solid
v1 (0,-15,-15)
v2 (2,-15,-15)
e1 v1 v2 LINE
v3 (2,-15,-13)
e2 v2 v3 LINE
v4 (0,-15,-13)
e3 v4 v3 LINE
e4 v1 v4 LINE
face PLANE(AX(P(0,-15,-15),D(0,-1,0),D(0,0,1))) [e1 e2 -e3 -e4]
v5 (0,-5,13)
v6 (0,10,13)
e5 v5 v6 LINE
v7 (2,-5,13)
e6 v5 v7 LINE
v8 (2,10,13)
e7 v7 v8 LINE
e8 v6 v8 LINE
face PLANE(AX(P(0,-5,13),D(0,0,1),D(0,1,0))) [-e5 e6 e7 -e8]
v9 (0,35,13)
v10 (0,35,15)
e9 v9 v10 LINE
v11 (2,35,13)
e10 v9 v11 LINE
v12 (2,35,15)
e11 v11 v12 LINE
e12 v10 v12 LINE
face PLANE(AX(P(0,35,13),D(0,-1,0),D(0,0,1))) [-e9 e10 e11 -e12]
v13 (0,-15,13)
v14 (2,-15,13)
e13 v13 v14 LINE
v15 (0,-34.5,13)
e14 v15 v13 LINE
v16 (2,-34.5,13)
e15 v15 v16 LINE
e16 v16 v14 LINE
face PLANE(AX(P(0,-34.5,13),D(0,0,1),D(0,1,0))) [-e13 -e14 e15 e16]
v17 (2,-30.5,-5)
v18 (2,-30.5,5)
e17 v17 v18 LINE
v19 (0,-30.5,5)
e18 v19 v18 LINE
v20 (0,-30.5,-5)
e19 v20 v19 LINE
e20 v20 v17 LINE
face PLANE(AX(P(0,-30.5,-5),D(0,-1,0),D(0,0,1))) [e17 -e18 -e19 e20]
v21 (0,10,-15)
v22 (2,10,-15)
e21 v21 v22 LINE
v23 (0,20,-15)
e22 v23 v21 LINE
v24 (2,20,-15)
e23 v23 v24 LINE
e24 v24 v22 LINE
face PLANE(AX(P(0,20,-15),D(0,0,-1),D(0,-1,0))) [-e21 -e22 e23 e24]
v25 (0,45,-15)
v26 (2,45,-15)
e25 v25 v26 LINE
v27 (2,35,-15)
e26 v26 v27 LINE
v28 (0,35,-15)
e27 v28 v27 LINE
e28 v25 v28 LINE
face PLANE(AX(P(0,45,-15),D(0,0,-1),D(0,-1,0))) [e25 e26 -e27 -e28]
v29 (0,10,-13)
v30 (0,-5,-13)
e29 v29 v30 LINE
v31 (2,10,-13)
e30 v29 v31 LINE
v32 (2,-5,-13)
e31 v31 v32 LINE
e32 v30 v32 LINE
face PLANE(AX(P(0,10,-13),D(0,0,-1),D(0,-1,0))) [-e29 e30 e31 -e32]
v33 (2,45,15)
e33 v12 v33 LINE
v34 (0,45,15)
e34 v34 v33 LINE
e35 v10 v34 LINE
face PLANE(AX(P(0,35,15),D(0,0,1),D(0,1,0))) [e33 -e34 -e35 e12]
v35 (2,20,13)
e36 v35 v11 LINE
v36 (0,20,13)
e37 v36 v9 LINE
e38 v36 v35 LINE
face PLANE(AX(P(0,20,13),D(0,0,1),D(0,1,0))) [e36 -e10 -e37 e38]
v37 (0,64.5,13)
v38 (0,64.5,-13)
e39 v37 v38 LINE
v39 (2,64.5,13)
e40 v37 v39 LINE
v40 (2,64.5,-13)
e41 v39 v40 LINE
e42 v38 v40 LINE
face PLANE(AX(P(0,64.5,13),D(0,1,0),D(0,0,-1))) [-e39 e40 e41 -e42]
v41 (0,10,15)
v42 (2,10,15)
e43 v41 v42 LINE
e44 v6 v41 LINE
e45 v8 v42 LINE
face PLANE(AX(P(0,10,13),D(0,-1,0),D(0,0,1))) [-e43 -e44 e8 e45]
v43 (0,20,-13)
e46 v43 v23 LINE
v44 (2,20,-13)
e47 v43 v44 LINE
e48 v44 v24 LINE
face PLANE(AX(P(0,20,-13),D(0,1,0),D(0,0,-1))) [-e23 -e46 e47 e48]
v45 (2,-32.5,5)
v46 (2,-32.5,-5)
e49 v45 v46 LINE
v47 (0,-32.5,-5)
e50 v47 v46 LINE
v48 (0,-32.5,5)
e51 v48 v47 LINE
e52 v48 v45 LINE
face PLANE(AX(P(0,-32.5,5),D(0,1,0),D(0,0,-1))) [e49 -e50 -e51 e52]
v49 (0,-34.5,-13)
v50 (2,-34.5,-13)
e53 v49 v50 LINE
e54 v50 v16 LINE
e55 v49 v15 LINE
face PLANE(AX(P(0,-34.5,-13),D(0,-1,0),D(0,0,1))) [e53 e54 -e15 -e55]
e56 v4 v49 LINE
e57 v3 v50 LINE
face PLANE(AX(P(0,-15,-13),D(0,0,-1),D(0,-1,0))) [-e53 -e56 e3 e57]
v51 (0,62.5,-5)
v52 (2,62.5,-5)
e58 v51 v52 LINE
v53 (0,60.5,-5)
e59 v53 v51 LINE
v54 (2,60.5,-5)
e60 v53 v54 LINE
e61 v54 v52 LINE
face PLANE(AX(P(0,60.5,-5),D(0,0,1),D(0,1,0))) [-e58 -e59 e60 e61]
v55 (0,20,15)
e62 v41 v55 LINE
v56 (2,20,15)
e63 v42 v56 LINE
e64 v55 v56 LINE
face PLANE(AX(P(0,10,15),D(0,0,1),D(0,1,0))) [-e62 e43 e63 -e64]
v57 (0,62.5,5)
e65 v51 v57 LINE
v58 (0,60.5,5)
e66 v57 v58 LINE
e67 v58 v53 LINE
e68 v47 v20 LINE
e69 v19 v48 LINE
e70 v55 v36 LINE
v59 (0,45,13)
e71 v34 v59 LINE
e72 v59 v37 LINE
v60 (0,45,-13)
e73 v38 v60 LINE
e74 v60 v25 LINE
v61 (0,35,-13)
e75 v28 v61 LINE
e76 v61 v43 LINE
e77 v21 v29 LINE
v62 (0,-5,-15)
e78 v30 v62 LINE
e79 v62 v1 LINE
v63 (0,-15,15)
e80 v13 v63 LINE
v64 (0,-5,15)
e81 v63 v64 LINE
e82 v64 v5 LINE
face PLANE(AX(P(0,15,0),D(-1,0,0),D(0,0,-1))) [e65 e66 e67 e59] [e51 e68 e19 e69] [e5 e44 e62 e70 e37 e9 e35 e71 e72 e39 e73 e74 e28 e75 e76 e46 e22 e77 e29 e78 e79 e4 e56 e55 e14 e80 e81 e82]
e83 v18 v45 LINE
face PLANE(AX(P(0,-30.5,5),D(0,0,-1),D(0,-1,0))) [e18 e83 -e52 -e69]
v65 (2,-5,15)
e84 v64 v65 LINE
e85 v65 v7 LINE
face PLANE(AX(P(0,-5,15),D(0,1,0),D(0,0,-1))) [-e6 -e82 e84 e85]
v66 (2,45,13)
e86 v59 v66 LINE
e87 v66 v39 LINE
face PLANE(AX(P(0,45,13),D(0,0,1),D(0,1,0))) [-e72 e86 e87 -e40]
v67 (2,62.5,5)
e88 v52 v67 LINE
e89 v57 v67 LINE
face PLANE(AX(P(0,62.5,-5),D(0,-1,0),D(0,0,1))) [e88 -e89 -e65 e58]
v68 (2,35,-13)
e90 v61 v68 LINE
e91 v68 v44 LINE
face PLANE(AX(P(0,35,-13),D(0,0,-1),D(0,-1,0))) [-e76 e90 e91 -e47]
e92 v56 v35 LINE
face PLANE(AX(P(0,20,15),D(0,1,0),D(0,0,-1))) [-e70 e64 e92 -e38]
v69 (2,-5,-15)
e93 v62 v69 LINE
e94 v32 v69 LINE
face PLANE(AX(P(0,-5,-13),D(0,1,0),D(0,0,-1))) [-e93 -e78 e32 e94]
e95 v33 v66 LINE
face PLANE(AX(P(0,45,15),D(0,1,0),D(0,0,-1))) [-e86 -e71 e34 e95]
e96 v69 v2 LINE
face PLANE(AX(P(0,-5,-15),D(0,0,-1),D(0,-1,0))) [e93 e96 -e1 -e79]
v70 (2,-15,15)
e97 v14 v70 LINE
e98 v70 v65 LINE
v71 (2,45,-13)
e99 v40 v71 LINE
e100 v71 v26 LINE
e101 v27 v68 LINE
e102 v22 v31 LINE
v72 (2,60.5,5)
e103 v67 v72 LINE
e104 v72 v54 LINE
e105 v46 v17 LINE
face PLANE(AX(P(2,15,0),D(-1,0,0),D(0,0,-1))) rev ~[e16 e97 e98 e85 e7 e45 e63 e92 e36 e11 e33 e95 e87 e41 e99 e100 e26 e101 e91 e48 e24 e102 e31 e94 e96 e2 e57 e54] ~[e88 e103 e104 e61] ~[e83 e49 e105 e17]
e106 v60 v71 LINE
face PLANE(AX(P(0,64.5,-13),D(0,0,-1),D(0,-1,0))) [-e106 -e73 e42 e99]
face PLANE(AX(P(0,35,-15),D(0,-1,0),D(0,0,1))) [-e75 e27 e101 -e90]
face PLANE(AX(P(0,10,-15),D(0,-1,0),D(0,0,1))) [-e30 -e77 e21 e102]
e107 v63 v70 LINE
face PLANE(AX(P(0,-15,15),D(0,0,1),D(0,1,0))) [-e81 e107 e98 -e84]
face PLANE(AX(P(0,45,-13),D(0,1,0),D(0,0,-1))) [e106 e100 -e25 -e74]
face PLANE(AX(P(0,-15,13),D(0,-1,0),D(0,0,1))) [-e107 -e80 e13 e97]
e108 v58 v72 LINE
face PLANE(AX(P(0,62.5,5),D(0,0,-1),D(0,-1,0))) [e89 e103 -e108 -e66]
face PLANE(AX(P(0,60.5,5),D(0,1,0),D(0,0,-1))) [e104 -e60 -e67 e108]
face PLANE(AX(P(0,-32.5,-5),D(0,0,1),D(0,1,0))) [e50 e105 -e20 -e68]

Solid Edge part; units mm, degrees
sketch "Sketch1" plane through (0, 0, 0) normal (1, 0, 0) x (0, 1, 0)
  line L0 (-5, 13) -> (10, 13)
  line L1 (10, 13) -> (10, 15)
  line L2 (10, 15) -> (20, 15)
  line L3 (20, 15) -> (20, 13)
  line L4 (20, 13) -> (35, 13)
  line L5 (35, 13) -> (35, 15)
  line L6 (35, 15) -> (45, 15)
  line L7 (45, 15) -> (45, 13)
  line L8 (45, 13) -> (64.5, 13)
  line L9 (64.5, 13) -> (64.5, -13)
  line L10 (64.5, -13) -> (45, -13)
  line L11 (45, -13) -> (45, -15)
  line L12 (45, -15) -> (35, -15)
  line L13 (35, -15) -> (35, -13)
  line L14 (35, -13) -> (20, -13)
  line L15 (20, -13) -> (20, -15)
  line L16 (20, -15) -> (10, -15)
  line L17 (10, -15) -> (10, -13)
  line L18 (10, -13) -> (-5, -13)
  line L19 (-5, -13) -> (-5, -15)
  line L20 (-5, -15) -> (-15, -15)
  line L21 (-15, -15) -> (-15, -13)
  line L22 (-15, -13) -> (-34.5, -13)
  line L23 (-34.5, -13) -> (-34.5, 13)
  line L24 (-34.5, 13) -> (-15, 13)
  line L25 (-15, 13) -> (-15, 15)
  line L26 (-15, 15) -> (-5, 15)
  line L27 (-5, 15) -> (-5, 13)
  line L28 (62.5, 5) -> (60.5, 5)
  line L29 (62.5, -5) -> (62.5, 5)
  line L30 (60.5, -5) -> (62.5, -5)
  line L31 (60.5, 5) -> (60.5, -5)
  line L32 (-30.5, -5) -> (-30.5, 5)
  line L33 (-32.5, -5) -> (-30.5, -5)
  line L34 (-32.5, 5) -> (-32.5, -5)
  line L35 (-30.5, 5) -> (-32.5, 5)
extrude "ExtrudedProtrusion_1" add sketch "Sketch1" along normal blind 2
properties material "Acrylic, high impact grade"
